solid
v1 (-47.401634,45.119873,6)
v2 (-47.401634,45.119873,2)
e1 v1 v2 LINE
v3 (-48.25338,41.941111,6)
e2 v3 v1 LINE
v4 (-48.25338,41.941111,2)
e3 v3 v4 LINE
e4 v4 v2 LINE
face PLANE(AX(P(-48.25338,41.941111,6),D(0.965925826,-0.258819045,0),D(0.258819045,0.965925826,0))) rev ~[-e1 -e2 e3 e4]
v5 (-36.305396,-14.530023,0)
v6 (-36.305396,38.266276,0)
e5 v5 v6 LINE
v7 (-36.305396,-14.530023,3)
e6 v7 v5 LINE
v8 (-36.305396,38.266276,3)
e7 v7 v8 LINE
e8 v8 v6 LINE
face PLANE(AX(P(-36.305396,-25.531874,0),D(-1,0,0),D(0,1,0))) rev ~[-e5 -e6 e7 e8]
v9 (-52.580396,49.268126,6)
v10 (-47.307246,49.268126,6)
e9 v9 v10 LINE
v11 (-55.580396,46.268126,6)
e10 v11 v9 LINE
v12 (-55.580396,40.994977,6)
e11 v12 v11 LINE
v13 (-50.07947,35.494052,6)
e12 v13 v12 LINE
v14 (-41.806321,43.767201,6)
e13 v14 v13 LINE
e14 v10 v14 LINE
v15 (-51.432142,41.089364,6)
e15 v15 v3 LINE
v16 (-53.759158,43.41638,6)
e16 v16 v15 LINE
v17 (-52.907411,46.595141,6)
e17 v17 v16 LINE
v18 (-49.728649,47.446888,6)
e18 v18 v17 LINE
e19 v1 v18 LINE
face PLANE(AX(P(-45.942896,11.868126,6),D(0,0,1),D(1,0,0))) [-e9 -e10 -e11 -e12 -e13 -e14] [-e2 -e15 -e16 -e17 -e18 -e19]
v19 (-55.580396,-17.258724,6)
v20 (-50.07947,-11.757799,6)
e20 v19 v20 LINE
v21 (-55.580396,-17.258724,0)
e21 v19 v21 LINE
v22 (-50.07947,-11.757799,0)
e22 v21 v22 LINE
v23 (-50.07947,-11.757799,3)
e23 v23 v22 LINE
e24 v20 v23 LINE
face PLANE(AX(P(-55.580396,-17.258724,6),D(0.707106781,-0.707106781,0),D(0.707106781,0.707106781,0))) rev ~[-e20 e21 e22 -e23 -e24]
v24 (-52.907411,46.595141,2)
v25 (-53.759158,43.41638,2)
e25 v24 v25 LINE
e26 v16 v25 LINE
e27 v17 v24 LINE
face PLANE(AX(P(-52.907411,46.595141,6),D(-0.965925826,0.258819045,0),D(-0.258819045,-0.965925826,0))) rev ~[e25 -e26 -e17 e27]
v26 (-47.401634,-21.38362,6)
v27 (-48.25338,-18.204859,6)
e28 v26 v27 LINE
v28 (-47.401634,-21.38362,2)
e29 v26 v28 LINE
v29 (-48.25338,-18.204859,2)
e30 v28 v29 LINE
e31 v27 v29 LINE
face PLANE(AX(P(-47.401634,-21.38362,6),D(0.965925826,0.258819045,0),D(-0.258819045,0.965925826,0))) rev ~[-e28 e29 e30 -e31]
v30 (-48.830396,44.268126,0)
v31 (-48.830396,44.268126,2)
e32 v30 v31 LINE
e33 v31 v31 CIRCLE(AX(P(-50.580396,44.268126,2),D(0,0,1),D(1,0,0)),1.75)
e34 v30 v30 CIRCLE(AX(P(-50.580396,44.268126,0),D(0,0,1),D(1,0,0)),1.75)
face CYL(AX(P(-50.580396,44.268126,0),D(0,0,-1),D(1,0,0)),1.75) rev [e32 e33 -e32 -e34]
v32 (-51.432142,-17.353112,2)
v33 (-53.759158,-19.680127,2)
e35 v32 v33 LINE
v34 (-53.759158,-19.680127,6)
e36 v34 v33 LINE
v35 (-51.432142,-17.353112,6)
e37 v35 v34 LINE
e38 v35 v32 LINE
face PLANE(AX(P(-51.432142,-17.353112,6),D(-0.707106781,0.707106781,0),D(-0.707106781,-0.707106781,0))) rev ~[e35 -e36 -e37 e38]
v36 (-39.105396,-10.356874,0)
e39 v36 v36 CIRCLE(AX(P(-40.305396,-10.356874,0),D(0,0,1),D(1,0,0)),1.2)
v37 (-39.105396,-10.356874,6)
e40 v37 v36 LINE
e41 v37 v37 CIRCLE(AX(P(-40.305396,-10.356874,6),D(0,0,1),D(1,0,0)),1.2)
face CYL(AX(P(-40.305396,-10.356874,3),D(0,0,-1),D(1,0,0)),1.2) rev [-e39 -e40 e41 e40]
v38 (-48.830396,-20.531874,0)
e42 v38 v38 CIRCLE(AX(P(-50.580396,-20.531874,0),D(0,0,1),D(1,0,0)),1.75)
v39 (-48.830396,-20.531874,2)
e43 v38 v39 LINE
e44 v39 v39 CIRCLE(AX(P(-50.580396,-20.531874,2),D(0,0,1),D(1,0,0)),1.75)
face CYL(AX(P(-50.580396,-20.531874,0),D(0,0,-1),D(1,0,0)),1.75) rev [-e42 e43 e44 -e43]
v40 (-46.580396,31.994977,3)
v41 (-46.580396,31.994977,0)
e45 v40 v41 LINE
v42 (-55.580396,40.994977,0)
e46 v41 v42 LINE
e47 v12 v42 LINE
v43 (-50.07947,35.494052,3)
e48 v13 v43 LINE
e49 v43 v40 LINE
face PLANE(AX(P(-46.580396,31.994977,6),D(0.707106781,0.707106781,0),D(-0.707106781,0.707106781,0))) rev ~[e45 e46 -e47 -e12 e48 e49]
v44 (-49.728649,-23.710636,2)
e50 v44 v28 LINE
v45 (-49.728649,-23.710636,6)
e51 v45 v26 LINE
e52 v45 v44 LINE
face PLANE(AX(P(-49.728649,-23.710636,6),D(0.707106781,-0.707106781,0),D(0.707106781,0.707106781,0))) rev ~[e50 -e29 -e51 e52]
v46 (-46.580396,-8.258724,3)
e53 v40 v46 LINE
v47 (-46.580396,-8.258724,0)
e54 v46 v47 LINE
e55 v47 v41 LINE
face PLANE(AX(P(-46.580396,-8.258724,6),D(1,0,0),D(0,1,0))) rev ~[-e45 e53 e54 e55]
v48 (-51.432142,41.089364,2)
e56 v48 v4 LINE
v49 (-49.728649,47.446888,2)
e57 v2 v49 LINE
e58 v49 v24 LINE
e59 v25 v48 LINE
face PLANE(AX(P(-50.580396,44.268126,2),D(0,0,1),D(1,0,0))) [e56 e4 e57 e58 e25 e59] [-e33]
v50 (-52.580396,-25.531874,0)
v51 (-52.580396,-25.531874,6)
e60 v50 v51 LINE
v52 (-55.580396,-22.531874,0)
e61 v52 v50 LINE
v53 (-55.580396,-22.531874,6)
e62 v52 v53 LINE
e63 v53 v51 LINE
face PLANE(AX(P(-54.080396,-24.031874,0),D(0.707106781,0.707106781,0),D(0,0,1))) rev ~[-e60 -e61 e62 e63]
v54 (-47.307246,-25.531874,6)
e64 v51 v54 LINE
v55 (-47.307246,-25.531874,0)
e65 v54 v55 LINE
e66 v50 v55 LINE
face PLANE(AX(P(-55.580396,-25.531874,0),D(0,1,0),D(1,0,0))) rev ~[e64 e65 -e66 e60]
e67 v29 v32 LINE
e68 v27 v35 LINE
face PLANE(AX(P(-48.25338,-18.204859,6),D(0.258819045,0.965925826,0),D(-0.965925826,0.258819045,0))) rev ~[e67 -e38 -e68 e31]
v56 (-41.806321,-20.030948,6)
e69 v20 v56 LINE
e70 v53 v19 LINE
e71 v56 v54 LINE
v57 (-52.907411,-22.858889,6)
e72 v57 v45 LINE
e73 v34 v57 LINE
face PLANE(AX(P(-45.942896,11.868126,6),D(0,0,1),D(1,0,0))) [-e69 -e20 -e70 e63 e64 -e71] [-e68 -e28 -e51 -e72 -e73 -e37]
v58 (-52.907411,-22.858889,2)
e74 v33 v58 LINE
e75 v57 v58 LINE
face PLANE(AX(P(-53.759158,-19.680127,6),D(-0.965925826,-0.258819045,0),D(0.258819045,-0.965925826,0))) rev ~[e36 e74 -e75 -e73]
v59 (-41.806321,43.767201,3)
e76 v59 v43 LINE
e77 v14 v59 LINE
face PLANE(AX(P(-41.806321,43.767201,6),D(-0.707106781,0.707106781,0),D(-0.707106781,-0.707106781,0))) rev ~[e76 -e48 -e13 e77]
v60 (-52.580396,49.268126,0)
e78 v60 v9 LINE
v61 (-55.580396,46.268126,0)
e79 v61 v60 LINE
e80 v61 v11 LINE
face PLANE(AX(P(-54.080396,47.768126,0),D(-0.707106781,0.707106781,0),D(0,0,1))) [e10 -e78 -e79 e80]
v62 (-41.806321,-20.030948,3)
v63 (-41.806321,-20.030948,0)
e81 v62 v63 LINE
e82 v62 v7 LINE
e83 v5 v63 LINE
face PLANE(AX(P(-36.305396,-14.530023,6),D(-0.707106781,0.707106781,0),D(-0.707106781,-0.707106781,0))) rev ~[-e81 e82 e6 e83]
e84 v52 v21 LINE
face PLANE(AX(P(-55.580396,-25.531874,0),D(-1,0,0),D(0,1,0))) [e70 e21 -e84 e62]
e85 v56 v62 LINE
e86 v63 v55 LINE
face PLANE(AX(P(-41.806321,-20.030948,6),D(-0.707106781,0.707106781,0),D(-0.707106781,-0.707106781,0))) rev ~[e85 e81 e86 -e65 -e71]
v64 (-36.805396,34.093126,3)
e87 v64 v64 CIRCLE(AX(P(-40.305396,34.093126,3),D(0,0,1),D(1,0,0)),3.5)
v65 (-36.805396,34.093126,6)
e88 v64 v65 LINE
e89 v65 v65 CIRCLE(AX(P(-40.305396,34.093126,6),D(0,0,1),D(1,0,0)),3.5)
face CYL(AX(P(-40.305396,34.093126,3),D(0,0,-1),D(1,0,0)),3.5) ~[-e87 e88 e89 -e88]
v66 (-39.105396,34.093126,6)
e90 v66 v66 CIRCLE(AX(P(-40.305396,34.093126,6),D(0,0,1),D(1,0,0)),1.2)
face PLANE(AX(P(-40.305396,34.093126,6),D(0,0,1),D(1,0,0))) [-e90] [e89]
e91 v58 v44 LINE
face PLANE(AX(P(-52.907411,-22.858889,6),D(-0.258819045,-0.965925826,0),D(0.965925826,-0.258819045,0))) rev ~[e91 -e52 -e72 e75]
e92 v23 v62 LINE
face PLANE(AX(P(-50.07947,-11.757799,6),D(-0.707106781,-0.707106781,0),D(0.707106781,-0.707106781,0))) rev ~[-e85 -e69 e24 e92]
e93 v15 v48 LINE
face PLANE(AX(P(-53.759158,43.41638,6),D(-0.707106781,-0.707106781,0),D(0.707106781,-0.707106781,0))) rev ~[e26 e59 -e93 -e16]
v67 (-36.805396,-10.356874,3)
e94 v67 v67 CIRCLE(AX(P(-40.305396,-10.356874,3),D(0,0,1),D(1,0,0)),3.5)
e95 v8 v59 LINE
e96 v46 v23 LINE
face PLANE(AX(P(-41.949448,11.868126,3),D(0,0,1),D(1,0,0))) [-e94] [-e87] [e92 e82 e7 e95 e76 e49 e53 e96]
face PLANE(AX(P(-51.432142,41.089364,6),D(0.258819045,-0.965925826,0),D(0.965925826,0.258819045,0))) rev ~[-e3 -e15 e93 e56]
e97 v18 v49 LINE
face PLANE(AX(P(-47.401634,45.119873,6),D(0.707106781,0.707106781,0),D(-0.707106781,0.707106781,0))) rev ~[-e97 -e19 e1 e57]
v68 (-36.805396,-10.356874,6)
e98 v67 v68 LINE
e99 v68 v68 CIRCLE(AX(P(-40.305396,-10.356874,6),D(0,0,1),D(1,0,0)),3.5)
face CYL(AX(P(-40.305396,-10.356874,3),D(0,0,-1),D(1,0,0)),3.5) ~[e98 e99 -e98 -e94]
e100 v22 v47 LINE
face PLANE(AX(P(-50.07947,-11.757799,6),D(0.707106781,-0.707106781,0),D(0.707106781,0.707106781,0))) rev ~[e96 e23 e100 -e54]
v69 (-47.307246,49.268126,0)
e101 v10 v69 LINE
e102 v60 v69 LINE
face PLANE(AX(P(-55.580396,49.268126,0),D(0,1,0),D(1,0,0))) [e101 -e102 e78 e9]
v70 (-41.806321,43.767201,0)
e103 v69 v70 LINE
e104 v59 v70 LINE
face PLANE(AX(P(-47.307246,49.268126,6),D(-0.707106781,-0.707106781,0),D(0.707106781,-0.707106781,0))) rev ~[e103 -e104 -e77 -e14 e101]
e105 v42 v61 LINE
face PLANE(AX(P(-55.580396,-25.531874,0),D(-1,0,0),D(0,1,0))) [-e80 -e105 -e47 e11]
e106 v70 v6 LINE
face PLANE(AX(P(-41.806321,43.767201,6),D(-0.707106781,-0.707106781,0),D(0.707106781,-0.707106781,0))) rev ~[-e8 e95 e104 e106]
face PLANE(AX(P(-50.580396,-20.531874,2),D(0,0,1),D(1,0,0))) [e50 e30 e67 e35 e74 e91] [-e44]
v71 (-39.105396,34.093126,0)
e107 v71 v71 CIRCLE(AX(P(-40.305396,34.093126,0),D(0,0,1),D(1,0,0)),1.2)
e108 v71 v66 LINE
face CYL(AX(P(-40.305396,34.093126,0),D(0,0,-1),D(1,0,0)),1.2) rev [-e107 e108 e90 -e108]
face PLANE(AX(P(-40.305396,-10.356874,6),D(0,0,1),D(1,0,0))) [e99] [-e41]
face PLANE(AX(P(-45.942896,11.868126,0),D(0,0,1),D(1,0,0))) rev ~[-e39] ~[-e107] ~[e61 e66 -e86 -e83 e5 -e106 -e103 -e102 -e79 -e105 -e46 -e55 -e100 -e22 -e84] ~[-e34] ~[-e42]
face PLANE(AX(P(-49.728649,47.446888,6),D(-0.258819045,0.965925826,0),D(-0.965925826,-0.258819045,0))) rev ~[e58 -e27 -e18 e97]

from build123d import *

# Parameters (mm, degrees)
F0_W     = 19.275
F0_H     = 74.8
F0_R     = 1.75
F0_R_2   = 1.2
F1_DEPTH = 6
F3_DEPTH = 25
F2_R     = 1.2
F4_DEPTH = 3
F5_SIZE  = 3
F2_R_2   = 1.75
F6_DEPTH = 4
F7_R     = 3.5
F7_R_2   = 1.2
F8_DEPTH = 3


# Not quite as in the source:
# - a feature names something its author has since deleted; it is built from what else it names


with BuildPart() as f1:
    # F0 (on Top) → F1 (new body)
    with BuildSketch(Plane.XY):
        with Locations((-45.9428956378, 11.8681262247)):
            Rectangle(F0_W, F0_H)
        with Locations((-50.5803956378, -20.5318737753)):
            Circle(F0_R, mode=Mode.SUBTRACT)
        with Locations((-40.3053956378, -10.3568737753)):
            Circle(F0_R_2, mode=Mode.SUBTRACT)
        with Locations((-40.3053956378, 34.0931262247)):
            Circle(F0_R_2, mode=Mode.SUBTRACT)
        with Locations((-50.5803956378, 44.2681262247)):
            Circle(F0_R, mode=Mode.SUBTRACT)
    extrude(amount=F1_DEPTH)

    # F2 (on face) → F3 (cut)
    with BuildSketch(Plane.XY.offset(6)):
        Polygon((-47.307246298, 49.2681262247), (-41.8063209679, 43.7672008947), (-36.3053956378, 38.2662755646), (-36.3053956378, 49.2681262247), align=None)
        Polygon((-55.5803956378, 40.9949768848), (-55.5803956378, -17.2587244354), (-50.0794703078, -11.7577991053), (-46.5803956378, -8.2587244354), (-46.5803956378, 31.9949768848), (-50.0794703078, 35.4940515548), align=None)
        Polygon((-36.3053956378, -14.5300231152), (-41.8063209679, -20.0309484452), (-47.307246298, -25.5318737753), (-36.3053956378, -25.5318737753), align=None)
    extrude(amount=-F3_DEPTH, mode=Mode.SUBTRACT)

    # F2 (on face) → F4 (cut)
    with BuildSketch(Plane.XY.offset(6)):
        Polygon((-46.5803956378, -8.2587244354), (-50.0794703078, -11.7577991053), (-41.8063209679, -20.0309484452), (-36.3053956378, -14.5300231152), (-36.3053956378, 38.2662755646), (-41.8063209679, 43.7672008947), (-50.0794703078, 35.4940515548), (-46.5803956378, 31.9949768848), align=None)
        with Locations((-40.3053956378, -10.3568737753)):
            Circle(F2_R, mode=Mode.SUBTRACT)
        with Locations((-40.3053956378, 34.0931262247)):
            Circle(F2_R, mode=Mode.SUBTRACT)
    extrude(amount=-F4_DEPTH, mode=Mode.SUBTRACT)

    # F5
    f5_edges = [f1.edges().sort_by_distance(p)[0] for p in [
        (-55.580396, 49.268126, 3),
        (-55.580396, -25.531874, 3),
    ]]
    chamfer(f5_edges, length=F5_SIZE)

    # F2 (on face) → F6 (cut)
    with BuildSketch(Plane.XY.offset(6)):
        Polygon((-49.7286489393, 47.4468881789), (-52.9074108935, 46.5951414804), (-53.759157592, 43.4163795262), (-51.4321423364, 41.0893642705), (-48.2533803822, 41.9411109691), (-47.4016336836, 45.1198729233), align=None)
        with Locations((-50.5803956378, 44.2681262247)):
            Circle(F2_R_2, mode=Mode.SUBTRACT)
        Polygon((-52.9074108935, -22.8588890309), (-49.7286489393, -23.7106357295), (-47.4016336836, -21.3836204738), (-48.2533803822, -18.2048585196), (-51.4321423364, -17.3531118211), (-53.759157592, -19.6801270767), align=None)
        with Locations((-50.5803956378, -20.5318737753)):
            Circle(F2_R_2, mode=Mode.SUBTRACT)
    extrude(amount=-F6_DEPTH, mode=Mode.SUBTRACT)

    # F7 (on face) → F8 (join)
    with BuildSketch(Plane.XY.offset(3)):
        with Locations((-40.3053956378, -10.3568737753)):
            Circle(F7_R)
        with Locations((-40.3053956378, -10.3568737753)):
            Circle(F7_R_2, mode=Mode.SUBTRACT)
        with Locations((-40.3053956378, 34.0931262247)):
            Circle(F7_R)
        with Locations((-40.3053956378, 34.0931262247)):
            Circle(F7_R_2, mode=Mode.SUBTRACT)
    extrude(amount=F8_DEPTH)


solid = f1.part
